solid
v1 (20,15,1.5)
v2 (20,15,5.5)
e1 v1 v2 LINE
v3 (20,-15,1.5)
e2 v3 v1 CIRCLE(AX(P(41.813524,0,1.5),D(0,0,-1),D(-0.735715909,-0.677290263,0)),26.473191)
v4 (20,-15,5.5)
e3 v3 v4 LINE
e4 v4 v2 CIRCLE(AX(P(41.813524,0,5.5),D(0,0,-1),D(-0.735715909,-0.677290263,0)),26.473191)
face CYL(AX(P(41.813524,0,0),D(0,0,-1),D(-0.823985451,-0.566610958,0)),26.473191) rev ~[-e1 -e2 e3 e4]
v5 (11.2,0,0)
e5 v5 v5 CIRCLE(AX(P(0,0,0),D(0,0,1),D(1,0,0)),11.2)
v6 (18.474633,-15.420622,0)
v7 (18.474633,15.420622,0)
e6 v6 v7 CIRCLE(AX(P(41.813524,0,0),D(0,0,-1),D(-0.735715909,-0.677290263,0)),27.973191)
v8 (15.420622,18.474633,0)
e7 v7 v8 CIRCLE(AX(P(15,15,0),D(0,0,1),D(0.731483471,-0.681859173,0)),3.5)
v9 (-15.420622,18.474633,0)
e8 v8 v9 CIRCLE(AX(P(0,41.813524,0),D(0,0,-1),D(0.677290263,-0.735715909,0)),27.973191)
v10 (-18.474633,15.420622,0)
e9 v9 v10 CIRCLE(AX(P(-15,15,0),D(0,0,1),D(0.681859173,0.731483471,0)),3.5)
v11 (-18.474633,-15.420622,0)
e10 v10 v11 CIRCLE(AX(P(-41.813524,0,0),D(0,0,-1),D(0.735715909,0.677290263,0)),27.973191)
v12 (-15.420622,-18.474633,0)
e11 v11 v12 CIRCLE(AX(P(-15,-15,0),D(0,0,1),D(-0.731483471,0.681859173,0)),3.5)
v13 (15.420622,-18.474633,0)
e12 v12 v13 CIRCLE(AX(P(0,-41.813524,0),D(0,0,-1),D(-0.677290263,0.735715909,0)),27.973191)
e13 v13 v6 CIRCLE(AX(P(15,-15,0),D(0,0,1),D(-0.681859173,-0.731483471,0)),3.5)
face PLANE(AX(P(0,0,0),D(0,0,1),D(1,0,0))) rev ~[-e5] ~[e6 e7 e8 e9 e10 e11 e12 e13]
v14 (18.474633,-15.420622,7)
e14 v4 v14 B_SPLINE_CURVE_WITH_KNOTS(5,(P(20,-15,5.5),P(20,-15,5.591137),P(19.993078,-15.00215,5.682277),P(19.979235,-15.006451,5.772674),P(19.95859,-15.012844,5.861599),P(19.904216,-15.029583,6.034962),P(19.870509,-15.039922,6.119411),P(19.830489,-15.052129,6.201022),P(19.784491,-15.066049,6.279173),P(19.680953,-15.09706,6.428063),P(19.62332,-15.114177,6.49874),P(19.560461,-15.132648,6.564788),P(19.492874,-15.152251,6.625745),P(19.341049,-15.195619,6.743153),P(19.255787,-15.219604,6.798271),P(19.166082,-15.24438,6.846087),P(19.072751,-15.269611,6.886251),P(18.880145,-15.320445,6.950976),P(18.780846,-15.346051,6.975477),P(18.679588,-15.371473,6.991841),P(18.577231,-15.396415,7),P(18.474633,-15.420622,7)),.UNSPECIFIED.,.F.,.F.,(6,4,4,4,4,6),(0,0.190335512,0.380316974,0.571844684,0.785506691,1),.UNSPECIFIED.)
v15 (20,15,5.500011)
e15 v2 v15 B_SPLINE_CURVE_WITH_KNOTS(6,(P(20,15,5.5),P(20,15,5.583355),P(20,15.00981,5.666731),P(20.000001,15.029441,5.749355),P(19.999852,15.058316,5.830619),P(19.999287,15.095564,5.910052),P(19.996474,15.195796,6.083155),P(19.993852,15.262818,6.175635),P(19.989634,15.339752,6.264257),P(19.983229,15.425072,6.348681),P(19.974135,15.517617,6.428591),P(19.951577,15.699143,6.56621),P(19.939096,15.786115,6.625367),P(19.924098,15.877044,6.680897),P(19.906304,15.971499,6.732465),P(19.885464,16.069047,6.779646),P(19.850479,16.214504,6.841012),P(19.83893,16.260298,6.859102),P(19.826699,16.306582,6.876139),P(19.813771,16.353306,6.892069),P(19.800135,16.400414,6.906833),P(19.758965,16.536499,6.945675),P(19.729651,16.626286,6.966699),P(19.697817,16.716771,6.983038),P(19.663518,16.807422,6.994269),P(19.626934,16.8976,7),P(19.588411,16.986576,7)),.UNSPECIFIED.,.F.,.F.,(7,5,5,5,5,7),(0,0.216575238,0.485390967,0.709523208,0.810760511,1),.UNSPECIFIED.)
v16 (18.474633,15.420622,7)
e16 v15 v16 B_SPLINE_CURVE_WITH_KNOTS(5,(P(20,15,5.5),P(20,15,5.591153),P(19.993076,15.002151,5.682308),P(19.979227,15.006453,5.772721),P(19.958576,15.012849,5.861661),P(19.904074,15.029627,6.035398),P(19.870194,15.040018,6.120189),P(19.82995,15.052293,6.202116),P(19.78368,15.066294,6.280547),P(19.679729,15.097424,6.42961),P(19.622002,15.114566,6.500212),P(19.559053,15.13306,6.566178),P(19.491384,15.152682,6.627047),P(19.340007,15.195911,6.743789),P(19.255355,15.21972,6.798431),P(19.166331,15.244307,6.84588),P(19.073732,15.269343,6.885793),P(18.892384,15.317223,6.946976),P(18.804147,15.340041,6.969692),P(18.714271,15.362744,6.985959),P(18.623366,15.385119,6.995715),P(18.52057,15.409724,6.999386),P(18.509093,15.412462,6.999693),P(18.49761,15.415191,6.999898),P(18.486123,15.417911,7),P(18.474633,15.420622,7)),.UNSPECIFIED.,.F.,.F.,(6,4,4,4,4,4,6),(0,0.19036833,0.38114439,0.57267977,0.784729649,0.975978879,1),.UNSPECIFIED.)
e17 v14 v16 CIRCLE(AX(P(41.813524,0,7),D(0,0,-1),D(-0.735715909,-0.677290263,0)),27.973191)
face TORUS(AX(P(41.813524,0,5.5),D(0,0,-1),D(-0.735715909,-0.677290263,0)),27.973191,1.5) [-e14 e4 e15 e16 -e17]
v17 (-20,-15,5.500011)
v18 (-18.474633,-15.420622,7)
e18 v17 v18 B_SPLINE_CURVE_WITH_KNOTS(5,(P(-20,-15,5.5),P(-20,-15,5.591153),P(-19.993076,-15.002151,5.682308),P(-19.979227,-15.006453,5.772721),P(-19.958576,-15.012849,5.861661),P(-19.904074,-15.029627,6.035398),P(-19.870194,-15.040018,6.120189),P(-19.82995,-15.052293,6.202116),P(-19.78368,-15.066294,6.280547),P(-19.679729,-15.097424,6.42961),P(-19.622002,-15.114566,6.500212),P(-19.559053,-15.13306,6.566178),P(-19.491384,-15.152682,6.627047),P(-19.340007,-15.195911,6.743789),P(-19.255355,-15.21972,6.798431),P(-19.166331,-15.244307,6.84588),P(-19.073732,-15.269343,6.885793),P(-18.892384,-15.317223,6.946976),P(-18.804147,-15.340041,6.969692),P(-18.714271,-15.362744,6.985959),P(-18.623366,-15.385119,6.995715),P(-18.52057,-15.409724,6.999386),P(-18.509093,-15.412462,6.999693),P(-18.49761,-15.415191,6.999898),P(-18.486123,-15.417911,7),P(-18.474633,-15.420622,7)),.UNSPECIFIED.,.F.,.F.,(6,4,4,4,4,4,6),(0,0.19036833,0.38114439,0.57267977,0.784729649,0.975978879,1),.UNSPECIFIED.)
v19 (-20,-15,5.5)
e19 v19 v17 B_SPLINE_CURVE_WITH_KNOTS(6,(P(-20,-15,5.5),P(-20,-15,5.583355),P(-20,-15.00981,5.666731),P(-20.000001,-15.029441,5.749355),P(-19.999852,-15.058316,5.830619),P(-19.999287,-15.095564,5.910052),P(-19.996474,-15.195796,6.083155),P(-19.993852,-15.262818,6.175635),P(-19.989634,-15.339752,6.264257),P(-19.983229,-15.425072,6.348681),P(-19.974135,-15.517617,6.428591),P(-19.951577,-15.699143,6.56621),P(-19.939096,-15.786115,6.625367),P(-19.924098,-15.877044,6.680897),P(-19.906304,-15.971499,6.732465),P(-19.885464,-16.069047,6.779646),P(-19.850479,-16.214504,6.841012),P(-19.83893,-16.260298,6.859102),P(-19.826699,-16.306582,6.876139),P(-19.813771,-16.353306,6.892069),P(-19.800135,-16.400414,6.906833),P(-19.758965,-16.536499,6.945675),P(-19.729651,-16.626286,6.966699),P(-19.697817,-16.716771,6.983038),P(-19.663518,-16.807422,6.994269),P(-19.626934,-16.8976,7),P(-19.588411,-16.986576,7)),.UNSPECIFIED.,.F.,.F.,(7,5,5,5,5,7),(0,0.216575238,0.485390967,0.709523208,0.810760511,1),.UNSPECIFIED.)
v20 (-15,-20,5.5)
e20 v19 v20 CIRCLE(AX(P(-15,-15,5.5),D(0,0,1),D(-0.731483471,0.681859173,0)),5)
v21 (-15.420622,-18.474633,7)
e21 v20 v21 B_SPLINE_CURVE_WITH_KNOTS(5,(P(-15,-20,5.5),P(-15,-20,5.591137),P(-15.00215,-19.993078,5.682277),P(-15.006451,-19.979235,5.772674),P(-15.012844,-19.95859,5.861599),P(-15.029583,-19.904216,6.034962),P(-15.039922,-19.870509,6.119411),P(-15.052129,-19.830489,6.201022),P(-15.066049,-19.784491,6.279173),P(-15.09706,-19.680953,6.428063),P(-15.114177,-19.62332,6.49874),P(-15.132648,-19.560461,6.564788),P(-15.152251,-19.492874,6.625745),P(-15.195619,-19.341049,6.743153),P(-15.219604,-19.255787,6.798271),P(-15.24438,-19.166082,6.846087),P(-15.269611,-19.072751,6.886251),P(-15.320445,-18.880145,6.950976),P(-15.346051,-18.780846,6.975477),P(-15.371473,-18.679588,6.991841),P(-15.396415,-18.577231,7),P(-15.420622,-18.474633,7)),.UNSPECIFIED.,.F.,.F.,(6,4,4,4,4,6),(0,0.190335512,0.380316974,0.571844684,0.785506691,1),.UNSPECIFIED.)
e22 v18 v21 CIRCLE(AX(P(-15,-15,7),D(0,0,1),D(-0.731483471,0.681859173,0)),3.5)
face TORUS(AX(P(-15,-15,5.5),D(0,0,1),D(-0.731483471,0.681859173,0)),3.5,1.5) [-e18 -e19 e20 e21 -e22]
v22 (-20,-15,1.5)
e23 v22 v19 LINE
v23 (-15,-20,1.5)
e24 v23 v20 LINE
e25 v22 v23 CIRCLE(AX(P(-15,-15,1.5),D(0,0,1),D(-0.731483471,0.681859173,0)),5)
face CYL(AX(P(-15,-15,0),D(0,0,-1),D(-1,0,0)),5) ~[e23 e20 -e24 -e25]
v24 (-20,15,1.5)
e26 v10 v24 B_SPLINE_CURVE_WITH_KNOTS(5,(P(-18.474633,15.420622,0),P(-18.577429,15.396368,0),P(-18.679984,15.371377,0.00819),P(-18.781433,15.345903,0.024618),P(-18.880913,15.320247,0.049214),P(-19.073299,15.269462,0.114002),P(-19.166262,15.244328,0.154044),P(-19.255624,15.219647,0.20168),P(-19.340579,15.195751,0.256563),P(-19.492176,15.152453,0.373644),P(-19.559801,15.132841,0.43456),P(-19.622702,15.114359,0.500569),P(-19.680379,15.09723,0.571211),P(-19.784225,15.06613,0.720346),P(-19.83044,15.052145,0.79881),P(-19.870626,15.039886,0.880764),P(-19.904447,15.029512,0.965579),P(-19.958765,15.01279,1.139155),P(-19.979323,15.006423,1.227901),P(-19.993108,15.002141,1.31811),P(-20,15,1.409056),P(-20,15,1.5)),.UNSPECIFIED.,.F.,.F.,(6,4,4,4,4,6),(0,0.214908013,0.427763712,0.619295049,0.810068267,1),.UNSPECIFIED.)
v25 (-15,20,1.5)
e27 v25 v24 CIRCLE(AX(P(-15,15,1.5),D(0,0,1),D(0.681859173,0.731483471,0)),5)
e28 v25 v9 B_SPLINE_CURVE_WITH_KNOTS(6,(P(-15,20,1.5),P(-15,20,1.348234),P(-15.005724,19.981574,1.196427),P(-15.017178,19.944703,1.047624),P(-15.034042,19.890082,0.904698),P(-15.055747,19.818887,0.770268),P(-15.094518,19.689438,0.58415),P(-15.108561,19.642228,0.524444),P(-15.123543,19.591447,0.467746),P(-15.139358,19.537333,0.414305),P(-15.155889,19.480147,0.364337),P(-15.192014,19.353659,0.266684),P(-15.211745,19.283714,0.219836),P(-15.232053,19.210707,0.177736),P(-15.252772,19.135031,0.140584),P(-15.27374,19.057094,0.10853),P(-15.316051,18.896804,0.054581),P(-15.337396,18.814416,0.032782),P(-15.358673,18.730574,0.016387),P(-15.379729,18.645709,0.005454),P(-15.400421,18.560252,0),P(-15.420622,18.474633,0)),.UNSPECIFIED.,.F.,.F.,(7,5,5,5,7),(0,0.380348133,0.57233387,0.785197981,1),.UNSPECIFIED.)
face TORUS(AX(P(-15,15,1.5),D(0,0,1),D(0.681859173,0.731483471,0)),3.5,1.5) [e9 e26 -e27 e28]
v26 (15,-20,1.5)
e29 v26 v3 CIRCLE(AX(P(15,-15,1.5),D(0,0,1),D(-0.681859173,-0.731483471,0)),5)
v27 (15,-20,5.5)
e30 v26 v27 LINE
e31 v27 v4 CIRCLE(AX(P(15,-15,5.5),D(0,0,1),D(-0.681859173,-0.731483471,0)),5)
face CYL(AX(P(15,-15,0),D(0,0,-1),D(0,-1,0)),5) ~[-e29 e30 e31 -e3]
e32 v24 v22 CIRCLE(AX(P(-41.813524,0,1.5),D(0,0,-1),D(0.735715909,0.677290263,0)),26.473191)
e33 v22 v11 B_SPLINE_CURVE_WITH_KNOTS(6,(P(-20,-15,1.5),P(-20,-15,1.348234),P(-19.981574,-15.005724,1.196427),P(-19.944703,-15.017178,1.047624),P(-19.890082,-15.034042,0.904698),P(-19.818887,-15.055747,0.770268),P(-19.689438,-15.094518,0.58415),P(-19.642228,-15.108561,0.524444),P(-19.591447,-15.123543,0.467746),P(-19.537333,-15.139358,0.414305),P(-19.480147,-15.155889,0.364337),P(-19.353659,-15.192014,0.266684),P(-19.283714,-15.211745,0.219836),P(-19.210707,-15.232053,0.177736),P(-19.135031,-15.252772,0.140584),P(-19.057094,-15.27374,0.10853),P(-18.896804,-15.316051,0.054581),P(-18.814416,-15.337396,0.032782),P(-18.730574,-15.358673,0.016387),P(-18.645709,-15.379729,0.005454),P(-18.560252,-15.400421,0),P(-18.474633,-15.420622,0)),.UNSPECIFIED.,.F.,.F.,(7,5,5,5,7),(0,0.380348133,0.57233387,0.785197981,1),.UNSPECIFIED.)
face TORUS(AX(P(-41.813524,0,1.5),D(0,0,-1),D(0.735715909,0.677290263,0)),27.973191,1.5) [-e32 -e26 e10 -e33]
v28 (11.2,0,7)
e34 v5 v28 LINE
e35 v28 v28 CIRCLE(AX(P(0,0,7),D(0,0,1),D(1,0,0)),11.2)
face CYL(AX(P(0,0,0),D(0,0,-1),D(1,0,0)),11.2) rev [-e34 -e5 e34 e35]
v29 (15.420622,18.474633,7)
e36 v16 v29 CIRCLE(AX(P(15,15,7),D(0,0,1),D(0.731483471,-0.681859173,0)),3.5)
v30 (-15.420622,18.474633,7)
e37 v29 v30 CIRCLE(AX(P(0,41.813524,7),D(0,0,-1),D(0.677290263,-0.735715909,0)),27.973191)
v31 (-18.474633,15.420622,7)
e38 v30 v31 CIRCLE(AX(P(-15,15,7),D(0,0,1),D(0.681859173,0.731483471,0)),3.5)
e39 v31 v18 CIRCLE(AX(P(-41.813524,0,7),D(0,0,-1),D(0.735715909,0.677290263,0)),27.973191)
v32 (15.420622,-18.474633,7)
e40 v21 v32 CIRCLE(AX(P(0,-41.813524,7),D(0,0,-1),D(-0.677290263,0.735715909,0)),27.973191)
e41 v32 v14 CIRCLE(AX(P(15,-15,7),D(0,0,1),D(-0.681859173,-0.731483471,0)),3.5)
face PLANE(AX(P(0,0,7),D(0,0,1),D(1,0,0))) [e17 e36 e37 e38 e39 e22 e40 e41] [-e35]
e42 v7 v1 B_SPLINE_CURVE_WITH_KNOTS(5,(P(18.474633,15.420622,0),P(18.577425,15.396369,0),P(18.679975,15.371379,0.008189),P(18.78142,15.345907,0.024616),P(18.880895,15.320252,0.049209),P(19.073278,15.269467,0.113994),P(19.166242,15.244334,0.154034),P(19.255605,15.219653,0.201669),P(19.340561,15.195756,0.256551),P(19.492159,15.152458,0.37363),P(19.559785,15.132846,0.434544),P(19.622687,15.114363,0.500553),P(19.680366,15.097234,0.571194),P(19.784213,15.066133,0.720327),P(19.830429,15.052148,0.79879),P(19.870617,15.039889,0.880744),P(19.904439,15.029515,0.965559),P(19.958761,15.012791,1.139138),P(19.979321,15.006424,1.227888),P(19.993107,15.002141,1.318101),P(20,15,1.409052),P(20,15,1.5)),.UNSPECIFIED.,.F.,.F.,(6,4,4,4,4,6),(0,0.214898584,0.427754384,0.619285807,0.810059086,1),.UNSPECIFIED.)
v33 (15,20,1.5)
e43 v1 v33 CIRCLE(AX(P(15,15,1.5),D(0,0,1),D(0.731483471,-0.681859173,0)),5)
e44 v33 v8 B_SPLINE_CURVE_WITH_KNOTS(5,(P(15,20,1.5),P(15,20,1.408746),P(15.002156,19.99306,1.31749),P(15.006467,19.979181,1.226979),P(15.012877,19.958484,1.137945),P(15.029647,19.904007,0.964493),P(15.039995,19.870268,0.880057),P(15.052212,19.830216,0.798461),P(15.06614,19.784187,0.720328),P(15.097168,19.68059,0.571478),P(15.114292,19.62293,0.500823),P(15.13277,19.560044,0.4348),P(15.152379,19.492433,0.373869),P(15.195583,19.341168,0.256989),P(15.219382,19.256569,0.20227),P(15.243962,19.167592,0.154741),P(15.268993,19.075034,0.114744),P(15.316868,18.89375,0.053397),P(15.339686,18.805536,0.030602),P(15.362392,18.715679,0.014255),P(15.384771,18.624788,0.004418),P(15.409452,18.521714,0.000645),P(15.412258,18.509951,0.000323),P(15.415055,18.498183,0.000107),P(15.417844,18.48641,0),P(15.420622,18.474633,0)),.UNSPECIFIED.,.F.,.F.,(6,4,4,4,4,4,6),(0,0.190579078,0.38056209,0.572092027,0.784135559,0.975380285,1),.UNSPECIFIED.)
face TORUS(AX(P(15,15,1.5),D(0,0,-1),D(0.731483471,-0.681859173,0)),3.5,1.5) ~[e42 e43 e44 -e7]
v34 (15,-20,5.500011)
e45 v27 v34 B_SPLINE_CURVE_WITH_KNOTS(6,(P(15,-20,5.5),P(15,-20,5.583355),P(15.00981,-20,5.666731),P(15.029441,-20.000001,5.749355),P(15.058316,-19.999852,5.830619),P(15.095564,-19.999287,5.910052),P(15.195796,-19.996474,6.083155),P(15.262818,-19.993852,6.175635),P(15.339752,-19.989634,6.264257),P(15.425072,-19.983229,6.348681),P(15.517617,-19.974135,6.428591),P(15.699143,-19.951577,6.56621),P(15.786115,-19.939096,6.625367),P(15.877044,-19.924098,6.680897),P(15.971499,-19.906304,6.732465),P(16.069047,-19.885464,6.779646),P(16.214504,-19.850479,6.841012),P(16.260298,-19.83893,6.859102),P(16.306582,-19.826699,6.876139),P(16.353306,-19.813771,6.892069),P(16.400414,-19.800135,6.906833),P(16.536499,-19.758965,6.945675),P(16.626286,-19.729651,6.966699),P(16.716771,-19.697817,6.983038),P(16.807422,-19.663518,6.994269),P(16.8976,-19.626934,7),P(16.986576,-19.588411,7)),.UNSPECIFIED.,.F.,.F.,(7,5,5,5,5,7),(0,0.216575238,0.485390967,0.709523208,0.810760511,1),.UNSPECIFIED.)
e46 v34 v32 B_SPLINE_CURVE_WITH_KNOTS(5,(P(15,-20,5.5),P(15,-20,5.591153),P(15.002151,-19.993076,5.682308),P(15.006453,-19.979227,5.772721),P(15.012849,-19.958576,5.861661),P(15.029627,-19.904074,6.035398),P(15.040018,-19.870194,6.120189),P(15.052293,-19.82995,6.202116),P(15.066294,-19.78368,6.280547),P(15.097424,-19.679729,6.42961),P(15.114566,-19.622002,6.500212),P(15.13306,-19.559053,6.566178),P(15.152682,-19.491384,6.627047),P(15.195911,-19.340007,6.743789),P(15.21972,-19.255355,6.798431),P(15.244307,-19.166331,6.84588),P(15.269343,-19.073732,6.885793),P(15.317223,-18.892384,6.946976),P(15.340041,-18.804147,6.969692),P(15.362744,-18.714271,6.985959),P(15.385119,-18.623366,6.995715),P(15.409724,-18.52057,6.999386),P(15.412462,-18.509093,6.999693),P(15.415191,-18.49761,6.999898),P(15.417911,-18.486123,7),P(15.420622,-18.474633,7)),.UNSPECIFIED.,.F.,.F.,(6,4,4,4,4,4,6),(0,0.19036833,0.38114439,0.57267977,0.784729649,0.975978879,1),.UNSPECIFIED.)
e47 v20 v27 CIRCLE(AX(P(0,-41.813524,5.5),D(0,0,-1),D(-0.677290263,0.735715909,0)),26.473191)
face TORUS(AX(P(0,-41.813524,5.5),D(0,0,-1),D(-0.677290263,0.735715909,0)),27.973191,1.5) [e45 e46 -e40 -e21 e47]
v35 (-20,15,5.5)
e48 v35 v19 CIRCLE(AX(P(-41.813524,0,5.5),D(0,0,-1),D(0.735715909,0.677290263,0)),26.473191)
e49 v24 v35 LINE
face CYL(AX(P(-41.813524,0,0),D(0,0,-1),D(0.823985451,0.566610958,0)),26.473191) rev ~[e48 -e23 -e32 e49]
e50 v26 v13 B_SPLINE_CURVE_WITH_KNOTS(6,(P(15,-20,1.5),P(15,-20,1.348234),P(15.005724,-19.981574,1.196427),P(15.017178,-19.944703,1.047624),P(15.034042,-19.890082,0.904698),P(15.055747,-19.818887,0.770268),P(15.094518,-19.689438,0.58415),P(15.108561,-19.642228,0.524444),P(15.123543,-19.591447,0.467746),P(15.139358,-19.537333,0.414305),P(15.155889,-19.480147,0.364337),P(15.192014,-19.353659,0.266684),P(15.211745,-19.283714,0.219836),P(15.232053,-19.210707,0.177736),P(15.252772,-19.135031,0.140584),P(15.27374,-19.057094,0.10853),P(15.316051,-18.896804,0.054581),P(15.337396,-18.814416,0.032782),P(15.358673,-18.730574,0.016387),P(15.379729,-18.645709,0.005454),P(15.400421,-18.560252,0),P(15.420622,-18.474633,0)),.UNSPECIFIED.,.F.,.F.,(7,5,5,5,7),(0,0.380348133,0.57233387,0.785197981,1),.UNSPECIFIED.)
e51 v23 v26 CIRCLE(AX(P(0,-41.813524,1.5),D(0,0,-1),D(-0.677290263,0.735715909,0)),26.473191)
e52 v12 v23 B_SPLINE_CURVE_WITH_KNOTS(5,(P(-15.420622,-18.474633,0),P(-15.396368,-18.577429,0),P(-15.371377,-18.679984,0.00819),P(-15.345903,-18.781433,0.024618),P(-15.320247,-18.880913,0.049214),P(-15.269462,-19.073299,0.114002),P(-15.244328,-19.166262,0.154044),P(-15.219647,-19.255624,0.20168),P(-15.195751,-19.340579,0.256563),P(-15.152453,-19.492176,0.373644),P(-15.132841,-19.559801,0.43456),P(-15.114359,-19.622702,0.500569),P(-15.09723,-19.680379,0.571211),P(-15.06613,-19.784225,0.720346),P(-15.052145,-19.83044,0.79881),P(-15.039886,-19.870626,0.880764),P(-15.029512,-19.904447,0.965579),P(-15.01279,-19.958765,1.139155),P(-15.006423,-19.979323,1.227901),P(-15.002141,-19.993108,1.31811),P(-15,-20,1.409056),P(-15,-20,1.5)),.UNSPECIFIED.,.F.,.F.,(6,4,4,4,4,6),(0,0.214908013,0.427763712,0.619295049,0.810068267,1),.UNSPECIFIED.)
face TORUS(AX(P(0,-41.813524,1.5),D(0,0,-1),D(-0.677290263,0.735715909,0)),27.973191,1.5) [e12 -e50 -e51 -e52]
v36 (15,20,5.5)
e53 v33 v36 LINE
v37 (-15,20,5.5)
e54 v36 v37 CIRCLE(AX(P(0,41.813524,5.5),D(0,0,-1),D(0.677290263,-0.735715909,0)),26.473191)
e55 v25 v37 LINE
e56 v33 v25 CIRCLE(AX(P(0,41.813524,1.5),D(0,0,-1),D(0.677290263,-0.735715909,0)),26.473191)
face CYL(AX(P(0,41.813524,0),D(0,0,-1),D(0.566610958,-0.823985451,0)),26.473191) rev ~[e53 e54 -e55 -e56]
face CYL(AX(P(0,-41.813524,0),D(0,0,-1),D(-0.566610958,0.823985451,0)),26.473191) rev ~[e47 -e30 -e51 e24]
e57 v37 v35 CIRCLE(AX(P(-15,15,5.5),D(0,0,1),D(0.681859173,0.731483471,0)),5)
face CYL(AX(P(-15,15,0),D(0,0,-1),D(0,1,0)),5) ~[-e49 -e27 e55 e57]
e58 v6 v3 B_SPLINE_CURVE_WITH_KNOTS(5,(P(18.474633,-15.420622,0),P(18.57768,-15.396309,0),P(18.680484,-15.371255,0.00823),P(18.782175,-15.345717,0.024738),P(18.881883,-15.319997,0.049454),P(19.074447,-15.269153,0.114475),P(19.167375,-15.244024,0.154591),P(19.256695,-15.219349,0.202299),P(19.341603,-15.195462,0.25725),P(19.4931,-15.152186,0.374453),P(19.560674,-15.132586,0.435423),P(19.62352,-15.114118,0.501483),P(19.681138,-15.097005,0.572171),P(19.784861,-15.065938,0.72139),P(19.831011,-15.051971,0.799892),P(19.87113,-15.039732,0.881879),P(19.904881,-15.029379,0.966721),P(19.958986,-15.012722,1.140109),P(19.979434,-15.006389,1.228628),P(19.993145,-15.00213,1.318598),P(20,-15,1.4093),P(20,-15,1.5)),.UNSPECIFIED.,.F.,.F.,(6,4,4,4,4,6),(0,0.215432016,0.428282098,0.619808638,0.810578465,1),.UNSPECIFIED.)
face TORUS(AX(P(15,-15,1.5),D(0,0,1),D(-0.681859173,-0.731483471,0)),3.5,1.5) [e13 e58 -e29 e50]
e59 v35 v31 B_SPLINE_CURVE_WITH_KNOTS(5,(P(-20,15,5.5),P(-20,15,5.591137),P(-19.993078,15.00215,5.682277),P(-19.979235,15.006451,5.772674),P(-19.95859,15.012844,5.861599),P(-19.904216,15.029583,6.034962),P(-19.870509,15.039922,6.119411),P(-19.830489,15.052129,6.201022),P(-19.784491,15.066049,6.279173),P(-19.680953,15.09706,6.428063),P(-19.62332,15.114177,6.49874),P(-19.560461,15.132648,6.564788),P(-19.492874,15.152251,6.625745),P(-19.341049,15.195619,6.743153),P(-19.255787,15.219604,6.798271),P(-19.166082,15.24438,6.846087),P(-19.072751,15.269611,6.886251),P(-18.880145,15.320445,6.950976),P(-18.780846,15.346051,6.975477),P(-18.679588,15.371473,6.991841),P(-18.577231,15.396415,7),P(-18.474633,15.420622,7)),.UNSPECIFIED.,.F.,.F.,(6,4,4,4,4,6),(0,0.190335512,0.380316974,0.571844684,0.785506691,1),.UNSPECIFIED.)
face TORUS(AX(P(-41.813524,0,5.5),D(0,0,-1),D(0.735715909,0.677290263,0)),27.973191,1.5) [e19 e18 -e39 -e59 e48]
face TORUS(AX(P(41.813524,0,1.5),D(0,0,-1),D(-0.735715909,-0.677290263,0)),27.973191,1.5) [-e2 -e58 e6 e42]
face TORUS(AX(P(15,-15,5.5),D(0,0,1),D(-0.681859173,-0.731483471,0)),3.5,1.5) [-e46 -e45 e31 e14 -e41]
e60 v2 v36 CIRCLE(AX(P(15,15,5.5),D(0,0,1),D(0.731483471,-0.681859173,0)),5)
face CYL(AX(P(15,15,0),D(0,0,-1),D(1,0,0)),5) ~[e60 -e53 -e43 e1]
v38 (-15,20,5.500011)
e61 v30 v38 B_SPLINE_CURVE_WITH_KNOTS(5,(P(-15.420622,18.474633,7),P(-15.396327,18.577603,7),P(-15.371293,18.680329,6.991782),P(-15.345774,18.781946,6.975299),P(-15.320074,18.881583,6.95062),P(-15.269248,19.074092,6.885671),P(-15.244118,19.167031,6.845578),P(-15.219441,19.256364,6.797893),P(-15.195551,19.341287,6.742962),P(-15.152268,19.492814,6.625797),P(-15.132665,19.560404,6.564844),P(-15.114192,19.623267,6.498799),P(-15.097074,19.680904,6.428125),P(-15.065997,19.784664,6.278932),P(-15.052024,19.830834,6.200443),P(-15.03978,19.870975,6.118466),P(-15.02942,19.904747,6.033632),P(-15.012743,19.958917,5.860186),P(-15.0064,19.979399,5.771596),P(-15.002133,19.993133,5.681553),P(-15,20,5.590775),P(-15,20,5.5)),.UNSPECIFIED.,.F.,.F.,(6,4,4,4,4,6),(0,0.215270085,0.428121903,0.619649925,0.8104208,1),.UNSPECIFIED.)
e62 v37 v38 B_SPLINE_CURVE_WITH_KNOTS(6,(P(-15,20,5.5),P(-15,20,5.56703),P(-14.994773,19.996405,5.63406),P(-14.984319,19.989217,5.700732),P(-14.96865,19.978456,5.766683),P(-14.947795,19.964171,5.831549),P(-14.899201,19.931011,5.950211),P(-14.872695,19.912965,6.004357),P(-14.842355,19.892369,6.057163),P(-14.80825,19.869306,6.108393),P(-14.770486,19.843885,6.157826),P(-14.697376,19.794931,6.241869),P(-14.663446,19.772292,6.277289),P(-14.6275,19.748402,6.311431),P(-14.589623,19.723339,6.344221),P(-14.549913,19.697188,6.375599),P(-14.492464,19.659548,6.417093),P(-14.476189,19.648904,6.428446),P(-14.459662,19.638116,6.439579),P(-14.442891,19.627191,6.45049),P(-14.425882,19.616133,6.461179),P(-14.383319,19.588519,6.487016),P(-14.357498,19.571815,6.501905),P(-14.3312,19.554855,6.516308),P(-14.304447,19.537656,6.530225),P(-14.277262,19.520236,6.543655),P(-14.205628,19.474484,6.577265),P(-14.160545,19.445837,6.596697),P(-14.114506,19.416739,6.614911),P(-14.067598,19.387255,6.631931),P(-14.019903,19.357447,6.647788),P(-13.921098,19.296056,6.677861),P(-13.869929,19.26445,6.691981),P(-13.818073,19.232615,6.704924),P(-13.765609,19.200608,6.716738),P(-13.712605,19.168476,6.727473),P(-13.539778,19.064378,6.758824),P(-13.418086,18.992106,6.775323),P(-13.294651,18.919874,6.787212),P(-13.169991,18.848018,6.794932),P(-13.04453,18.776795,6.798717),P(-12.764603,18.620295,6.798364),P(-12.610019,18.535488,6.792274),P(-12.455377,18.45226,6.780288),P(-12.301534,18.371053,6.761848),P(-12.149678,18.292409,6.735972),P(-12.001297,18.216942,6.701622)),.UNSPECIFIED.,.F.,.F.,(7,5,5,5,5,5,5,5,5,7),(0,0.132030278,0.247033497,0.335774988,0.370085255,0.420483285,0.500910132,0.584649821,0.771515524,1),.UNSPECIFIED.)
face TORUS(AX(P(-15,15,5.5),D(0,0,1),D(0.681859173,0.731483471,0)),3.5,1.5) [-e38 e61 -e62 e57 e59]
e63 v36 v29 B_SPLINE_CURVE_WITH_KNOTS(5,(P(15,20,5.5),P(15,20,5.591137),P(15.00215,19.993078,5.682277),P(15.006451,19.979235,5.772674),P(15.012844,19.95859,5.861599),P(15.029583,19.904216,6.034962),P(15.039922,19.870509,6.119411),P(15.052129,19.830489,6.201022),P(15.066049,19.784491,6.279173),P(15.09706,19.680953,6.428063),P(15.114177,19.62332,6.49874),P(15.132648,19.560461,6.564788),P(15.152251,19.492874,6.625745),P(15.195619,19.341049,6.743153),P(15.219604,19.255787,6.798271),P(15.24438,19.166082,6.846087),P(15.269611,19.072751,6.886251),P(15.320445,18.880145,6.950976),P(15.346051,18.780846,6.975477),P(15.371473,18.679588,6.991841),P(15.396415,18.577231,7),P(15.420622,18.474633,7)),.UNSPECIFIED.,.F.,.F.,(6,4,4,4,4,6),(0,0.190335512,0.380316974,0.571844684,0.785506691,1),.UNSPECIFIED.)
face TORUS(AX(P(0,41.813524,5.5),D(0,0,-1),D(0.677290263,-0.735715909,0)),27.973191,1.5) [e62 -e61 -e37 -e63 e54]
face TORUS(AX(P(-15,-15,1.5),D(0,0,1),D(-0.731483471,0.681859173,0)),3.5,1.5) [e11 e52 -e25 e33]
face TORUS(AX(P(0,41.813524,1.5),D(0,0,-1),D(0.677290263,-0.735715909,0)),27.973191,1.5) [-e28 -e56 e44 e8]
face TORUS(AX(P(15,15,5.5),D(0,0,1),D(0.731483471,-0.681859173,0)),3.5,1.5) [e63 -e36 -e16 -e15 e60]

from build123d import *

# Parameters (mm, degrees)
F0_R         = 11.2
F1_DEPTH     = 7
F2_T3_ANGLE  = 85.2645116728
F2_T6_ANGLE  = 175.9781935424
F2_T9_ANGLE  = 85.2645116728
F2_T12_ANGLE = 175.9781935424
F2_T15_ANGLE = 85.2645116728
F2_T18_ANGLE = 175.9781935424
F2_T21_ANGLE = 85.2645116728
F2_T24_ANGLE = 175.9781935424
F3_T2_ANGLE  = 85.2645116728
F3_T4_ANGLE  = 85.2645116728
F3_T6_ANGLE  = 85.2645116728
F3_T8_ANGLE  = 85.2645116728
F3_T10_ANGLE = 175.9781935424
F3_T12_ANGLE = 175.9781935424
F3_T14_ANGLE = 175.9781935424
F3_T16_ANGLE = 175.9781935424


# Not quite as in the source:
# - a fillet or chamfer that OpenCascade refuses, or shapes differently, is made with other operations: its cross-section is extruded or revolved along the edge and cut away or added


with BuildPart() as f1:
    # F0 (on Top) → F1 (new body)
    with BuildSketch(Plane.XY):
        with BuildLine():
            ThreePointArc((15, 20), (0, 15.3403332466), (-15, 20))
            ThreePointArc((-15, 20), (-18.5355339059, 18.5355339059), (-20, 15))
            ThreePointArc((-20, 15), (-15.3403332466, 0), (-20, -15))
            ThreePointArc((-20, -15), (-18.5355339059, -18.5355339059), (-15, -20))
            ThreePointArc((-15, -20), (0, -15.3403332466), (15, -20))
            ThreePointArc((15, -20), (18.5355339059, -18.5355339059), (20, -15))
            ThreePointArc((20, -15), (15.3403332466, 0), (20, 15))
            ThreePointArc((20, 15), (18.5355339059, 18.5355339059), (15, 20))
        make_face()
        Circle(F0_R, mode=Mode.SUBTRACT)
    extrude(amount=F1_DEPTH)

    # F2: fillet of radius 1.5 on 8 edges, made by hand


with BuildPart() as f2_tool1:
    # F2_s2 → F2_t3 (revolve)
    with BuildSketch(Plane(origin=(20.8353956291, 19.1807876052, 0), x_dir=(0, 0, 1), z_dir=(0.7357159093, 0.6772902634, 0))):
        with BuildLine():
            ThreePointArc((5.5, -4.2896840575), (6.5606601718, -3.8503442293), (7, -2.7896840575))
            Line((7, -2.7896840575), (7, -4.2896840575))
            Line((7, -4.2896840575), (5.5, -4.2896840575))
        make_face()
    revolve(axis=Axis((0, 41.8135240681, 7), (0, 0, -1)), revolution_arc=F2_T3_ANGLE)


with BuildPart() as f2_tool4:
    # F2_s5 → F2_t6 (revolve)
    with BuildSketch(Plane(origin=(14.4555096977, 15.5075517385, 0), x_dir=(0, 0, 1), z_dir=(-0.6818591731, -0.7314834708, 0))):
        with BuildLine():
            ThreePointArc((5.5, -5.7443644649), (6.5606601718, -5.3050246367), (7, -4.2443644649))
            Line((7, -4.2443644649), (7, -5.7443644649))
            Line((7, -5.7443644649), (5.5, -5.7443644649))
        make_face()
    revolve(axis=Axis((15, 15, 7), (0, 0, 1)), revolution_arc=F2_T6_ANGLE)


with BuildPart() as f2_tool7:
    # F2_s8 → F2_t9 (revolve)
    with BuildSketch(Plane(origin=(19.1807876052, -20.8353956291, 0), x_dir=(0, 0, 1), z_dir=(0.6772902634, -0.7357159093, 0))):
        with BuildLine():
            ThreePointArc((5.5, -4.2896840575), (6.5606601718, -3.8503442293), (7, -2.7896840575))
            Line((7, -2.7896840575), (7, -4.2896840575))
            Line((7, -4.2896840575), (5.5, -4.2896840575))
        make_face()
    revolve(axis=Axis((41.8135240681, 0, 7), (0, 0, -1)), revolution_arc=F2_T9_ANGLE)


with BuildPart() as f2_tool10:
    # F2_s11 → F2_t12 (revolve)
    with BuildSketch(Plane(origin=(15.5075517385, -14.4555096977, 0), x_dir=(0, 0, 1), z_dir=(-0.7314834708, 0.6818591731, 0))):
        with BuildLine():
            ThreePointArc((5.5, -5.7443644649), (6.5606601718, -5.3050246367), (7, -4.2443644649))
            Line((7, -4.2443644649), (7, -5.7443644649))
            Line((7, -5.7443644649), (5.5, -5.7443644649))
        make_face()
    revolve(axis=Axis((15, -15, 7), (0, 0, 1)), revolution_arc=F2_T12_ANGLE)


with BuildPart() as f2_tool13:
    # F2_s14 → F2_t15 (revolve)
    with BuildSketch(Plane(origin=(-20.8353956291, -19.1807876052, 0), x_dir=(0, 0, 1), z_dir=(-0.7357159093, -0.6772902634, 0))):
        with BuildLine():
            ThreePointArc((5.5, -4.2896840575), (6.5606601718, -3.8503442293), (7, -2.7896840575))
            Line((7, -2.7896840575), (7, -4.2896840575))
            Line((7, -4.2896840575), (5.5, -4.2896840575))
        make_face()
    revolve(axis=Axis((0, -41.8135240681, 7), (0, 0, -1)), revolution_arc=F2_T15_ANGLE)


with BuildPart() as f2_tool16:
    # F2_s17 → F2_t18 (revolve)
    with BuildSketch(Plane(origin=(-14.4555096977, -15.5075517385, 0), x_dir=(0, 0, 1), z_dir=(0.6818591731, 0.7314834708, 0))):
        with BuildLine():
            ThreePointArc((5.5, -5.7443644649), (6.5606601718, -5.3050246367), (7, -4.2443644649))
            Line((7, -4.2443644649), (7, -5.7443644649))
            Line((7, -5.7443644649), (5.5, -5.7443644649))
        make_face()
    revolve(axis=Axis((-15, -15, 7), (0, 0, 1)), revolution_arc=F2_T18_ANGLE)


with BuildPart() as f2_tool19:
    # F2_s20 → F2_t21 (revolve)
    with BuildSketch(Plane(origin=(-19.1807876052, 20.8353956291, 0), x_dir=(0, 0, 1), z_dir=(-0.6772902634, 0.7357159093, 0))):
        with BuildLine():
            ThreePointArc((5.5, -4.2896840575), (6.5606601718, -3.8503442293), (7, -2.7896840575))
            Line((7, -2.7896840575), (7, -4.2896840575))
            Line((7, -4.2896840575), (5.5, -4.2896840575))
        make_face()
    revolve(axis=Axis((-41.8135240681, 0, 7), (0, 0, -1)), revolution_arc=F2_T21_ANGLE)


with BuildPart() as f2_tool22:
    # F2_s23 → F2_t24 (revolve)
    with BuildSketch(Plane(origin=(-15.5075517385, 14.4555096977, 0), x_dir=(0, 0, 1), z_dir=(0.7314834708, -0.6818591731, 0))):
        with BuildLine():
            ThreePointArc((5.5, -5.7443644649), (6.5606601718, -5.3050246367), (7, -4.2443644649))
            Line((7, -4.2443644649), (7, -5.7443644649))
            Line((7, -5.7443644649), (5.5, -5.7443644649))
        make_face()
    revolve(axis=Axis((-15, 15, 7), (0, 0, 1)), revolution_arc=F2_T24_ANGLE)


with BuildPart() as f1_1:
    add(f1.part)

    # F2_t25: cut F2_tool1, F2_tool4, F2_tool7, F2_tool10, F2_tool13, F2_tool16, F2_tool19, F2_tool22
    add([f2_tool1.part, f2_tool4.part, f2_tool7.part, f2_tool10.part, f2_tool13.part, f2_tool16.part, f2_tool19.part, f2_tool22.part], mode=Mode.SUBTRACT)

    # F3: fillet of radius 1.5 on 8 edges, made by hand

    # F3_s1 → F3_t2 (revolve, cut)
    with BuildSketch(Plane(origin=(-20.8353956291, -19.1807876052, 0), x_dir=(0, 0, 1), z_dir=(-0.7357159093, -0.6772902634, 0))):
        with BuildLine():
            ThreePointArc((0, -2.7896840575), (0.4393398282, -3.8503442293), (1.5, -4.2896840575))
            Line((1.5, -4.2896840575), (0, -4.2896840575))
            Line((0, -4.2896840575), (0, -2.7896840575))
        make_face()
    revolve(axis=Axis((0, -41.8135240681, 0), (0, 0, -1)), revolution_arc=F3_T2_ANGLE, mode=Mode.SUBTRACT)

    # F3_s3 → F3_t4 (revolve, cut)
    with BuildSketch(Plane(origin=(-19.1807876052, 20.8353956291, 0), x_dir=(0, 0, 1), z_dir=(-0.6772902634, 0.7357159093, 0))):
        with BuildLine():
            ThreePointArc((0, -2.7896840575), (0.4393398282, -3.8503442293), (1.5, -4.2896840575))
            Line((1.5, -4.2896840575), (0, -4.2896840575))
            Line((0, -4.2896840575), (0, -2.7896840575))
        make_face()
    revolve(axis=Axis((-41.8135240681, 0, 0), (0, 0, -1)), revolution_arc=F3_T4_ANGLE, mode=Mode.SUBTRACT)

    # F3_s5 → F3_t6 (revolve, cut)
    with BuildSketch(Plane(origin=(20.8353956291, 19.1807876052, 0), x_dir=(0, 0, 1), z_dir=(0.7357159093, 0.6772902634, 0))):
        with BuildLine():
            ThreePointArc((0, -2.7896840575), (0.4393398282, -3.8503442293), (1.5, -4.2896840575))
            Line((1.5, -4.2896840575), (0, -4.2896840575))
            Line((0, -4.2896840575), (0, -2.7896840575))
        make_face()
    revolve(axis=Axis((0, 41.8135240681, 0), (0, 0, -1)), revolution_arc=F3_T6_ANGLE, mode=Mode.SUBTRACT)

    # F3_s7 → F3_t8 (revolve, cut)
    with BuildSketch(Plane(origin=(19.1807876052, -20.8353956291, 0), x_dir=(0, 0, 1), z_dir=(0.6772902634, -0.7357159093, 0))):
        with BuildLine():
            ThreePointArc((0, -2.7896840575), (0.4393398282, -3.8503442293), (1.5, -4.2896840575))
            Line((1.5, -4.2896840575), (0, -4.2896840575))
            Line((0, -4.2896840575), (0, -2.7896840575))
        make_face()
    revolve(axis=Axis((41.8135240681, 0, 0), (0, 0, -1)), revolution_arc=F3_T8_ANGLE, mode=Mode.SUBTRACT)

    # F3_s9 → F3_t10 (revolve, cut)
    with BuildSketch(Plane(origin=(15.5075517385, -14.4555096977, 0), x_dir=(0, 0, 1), z_dir=(-0.7314834708, 0.6818591731, 0))):
        with BuildLine():
            ThreePointArc((0, -4.2443644649), (0.4393398282, -5.3050246367), (1.5, -5.7443644649))
            Line((1.5, -5.7443644649), (0, -5.7443644649))
            Line((0, -5.7443644649), (0, -4.2443644649))
        make_face()
    revolve(axis=Axis((15, -15, 0), (0, 0, 1)), revolution_arc=F3_T10_ANGLE, mode=Mode.SUBTRACT)

    # F3_s11 → F3_t12 (revolve, cut)
    with BuildSketch(Plane(origin=(-14.4555096977, -15.5075517385, 0), x_dir=(0, 0, 1), z_dir=(0.6818591731, 0.7314834708, 0))):
        with BuildLine():
            ThreePointArc((0, -4.2443644649), (0.4393398282, -5.3050246367), (1.5, -5.7443644649))
            Line((1.5, -5.7443644649), (0, -5.7443644649))
            Line((0, -5.7443644649), (0, -4.2443644649))
        make_face()
    revolve(axis=Axis((-15, -15, 0), (0, 0, 1)), revolution_arc=F3_T12_ANGLE, mode=Mode.SUBTRACT)

    # F3_s13 → F3_t14 (revolve, cut)
    with BuildSketch(Plane(origin=(-15.5075517385, 14.4555096977, 0), x_dir=(0, 0, 1), z_dir=(0.7314834708, -0.6818591731, 0))):
        with BuildLine():
            ThreePointArc((0, -4.2443644649), (0.4393398282, -5.3050246367), (1.5, -5.7443644649))
            Line((1.5, -5.7443644649), (0, -5.7443644649))
            Line((0, -5.7443644649), (0, -4.2443644649))
        make_face()
    revolve(axis=Axis((-15, 15, 0), (0, 0, 1)), revolution_arc=F3_T14_ANGLE, mode=Mode.SUBTRACT)

    # F3_s15 → F3_t16 (revolve, cut)
    with BuildSketch(Plane(origin=(14.4555096977, 15.5075517385, 0), x_dir=(0, 0, 1), z_dir=(-0.6818591731, -0.7314834708, 0))):
        with BuildLine():
            ThreePointArc((1.5, -5.7443644649), (0.4393398282, -5.3050246367), (0, -4.2443644649))
            Line((0, -4.2443644649), (0, -5.7443644649))
            Line((0, -5.7443644649), (1.5, -5.7443644649))
        make_face()
    revolve(axis=Axis((15, 15, 0), (0, 0, 1)), revolution_arc=F3_T16_ANGLE, mode=Mode.SUBTRACT)


solid = f1_1.part
